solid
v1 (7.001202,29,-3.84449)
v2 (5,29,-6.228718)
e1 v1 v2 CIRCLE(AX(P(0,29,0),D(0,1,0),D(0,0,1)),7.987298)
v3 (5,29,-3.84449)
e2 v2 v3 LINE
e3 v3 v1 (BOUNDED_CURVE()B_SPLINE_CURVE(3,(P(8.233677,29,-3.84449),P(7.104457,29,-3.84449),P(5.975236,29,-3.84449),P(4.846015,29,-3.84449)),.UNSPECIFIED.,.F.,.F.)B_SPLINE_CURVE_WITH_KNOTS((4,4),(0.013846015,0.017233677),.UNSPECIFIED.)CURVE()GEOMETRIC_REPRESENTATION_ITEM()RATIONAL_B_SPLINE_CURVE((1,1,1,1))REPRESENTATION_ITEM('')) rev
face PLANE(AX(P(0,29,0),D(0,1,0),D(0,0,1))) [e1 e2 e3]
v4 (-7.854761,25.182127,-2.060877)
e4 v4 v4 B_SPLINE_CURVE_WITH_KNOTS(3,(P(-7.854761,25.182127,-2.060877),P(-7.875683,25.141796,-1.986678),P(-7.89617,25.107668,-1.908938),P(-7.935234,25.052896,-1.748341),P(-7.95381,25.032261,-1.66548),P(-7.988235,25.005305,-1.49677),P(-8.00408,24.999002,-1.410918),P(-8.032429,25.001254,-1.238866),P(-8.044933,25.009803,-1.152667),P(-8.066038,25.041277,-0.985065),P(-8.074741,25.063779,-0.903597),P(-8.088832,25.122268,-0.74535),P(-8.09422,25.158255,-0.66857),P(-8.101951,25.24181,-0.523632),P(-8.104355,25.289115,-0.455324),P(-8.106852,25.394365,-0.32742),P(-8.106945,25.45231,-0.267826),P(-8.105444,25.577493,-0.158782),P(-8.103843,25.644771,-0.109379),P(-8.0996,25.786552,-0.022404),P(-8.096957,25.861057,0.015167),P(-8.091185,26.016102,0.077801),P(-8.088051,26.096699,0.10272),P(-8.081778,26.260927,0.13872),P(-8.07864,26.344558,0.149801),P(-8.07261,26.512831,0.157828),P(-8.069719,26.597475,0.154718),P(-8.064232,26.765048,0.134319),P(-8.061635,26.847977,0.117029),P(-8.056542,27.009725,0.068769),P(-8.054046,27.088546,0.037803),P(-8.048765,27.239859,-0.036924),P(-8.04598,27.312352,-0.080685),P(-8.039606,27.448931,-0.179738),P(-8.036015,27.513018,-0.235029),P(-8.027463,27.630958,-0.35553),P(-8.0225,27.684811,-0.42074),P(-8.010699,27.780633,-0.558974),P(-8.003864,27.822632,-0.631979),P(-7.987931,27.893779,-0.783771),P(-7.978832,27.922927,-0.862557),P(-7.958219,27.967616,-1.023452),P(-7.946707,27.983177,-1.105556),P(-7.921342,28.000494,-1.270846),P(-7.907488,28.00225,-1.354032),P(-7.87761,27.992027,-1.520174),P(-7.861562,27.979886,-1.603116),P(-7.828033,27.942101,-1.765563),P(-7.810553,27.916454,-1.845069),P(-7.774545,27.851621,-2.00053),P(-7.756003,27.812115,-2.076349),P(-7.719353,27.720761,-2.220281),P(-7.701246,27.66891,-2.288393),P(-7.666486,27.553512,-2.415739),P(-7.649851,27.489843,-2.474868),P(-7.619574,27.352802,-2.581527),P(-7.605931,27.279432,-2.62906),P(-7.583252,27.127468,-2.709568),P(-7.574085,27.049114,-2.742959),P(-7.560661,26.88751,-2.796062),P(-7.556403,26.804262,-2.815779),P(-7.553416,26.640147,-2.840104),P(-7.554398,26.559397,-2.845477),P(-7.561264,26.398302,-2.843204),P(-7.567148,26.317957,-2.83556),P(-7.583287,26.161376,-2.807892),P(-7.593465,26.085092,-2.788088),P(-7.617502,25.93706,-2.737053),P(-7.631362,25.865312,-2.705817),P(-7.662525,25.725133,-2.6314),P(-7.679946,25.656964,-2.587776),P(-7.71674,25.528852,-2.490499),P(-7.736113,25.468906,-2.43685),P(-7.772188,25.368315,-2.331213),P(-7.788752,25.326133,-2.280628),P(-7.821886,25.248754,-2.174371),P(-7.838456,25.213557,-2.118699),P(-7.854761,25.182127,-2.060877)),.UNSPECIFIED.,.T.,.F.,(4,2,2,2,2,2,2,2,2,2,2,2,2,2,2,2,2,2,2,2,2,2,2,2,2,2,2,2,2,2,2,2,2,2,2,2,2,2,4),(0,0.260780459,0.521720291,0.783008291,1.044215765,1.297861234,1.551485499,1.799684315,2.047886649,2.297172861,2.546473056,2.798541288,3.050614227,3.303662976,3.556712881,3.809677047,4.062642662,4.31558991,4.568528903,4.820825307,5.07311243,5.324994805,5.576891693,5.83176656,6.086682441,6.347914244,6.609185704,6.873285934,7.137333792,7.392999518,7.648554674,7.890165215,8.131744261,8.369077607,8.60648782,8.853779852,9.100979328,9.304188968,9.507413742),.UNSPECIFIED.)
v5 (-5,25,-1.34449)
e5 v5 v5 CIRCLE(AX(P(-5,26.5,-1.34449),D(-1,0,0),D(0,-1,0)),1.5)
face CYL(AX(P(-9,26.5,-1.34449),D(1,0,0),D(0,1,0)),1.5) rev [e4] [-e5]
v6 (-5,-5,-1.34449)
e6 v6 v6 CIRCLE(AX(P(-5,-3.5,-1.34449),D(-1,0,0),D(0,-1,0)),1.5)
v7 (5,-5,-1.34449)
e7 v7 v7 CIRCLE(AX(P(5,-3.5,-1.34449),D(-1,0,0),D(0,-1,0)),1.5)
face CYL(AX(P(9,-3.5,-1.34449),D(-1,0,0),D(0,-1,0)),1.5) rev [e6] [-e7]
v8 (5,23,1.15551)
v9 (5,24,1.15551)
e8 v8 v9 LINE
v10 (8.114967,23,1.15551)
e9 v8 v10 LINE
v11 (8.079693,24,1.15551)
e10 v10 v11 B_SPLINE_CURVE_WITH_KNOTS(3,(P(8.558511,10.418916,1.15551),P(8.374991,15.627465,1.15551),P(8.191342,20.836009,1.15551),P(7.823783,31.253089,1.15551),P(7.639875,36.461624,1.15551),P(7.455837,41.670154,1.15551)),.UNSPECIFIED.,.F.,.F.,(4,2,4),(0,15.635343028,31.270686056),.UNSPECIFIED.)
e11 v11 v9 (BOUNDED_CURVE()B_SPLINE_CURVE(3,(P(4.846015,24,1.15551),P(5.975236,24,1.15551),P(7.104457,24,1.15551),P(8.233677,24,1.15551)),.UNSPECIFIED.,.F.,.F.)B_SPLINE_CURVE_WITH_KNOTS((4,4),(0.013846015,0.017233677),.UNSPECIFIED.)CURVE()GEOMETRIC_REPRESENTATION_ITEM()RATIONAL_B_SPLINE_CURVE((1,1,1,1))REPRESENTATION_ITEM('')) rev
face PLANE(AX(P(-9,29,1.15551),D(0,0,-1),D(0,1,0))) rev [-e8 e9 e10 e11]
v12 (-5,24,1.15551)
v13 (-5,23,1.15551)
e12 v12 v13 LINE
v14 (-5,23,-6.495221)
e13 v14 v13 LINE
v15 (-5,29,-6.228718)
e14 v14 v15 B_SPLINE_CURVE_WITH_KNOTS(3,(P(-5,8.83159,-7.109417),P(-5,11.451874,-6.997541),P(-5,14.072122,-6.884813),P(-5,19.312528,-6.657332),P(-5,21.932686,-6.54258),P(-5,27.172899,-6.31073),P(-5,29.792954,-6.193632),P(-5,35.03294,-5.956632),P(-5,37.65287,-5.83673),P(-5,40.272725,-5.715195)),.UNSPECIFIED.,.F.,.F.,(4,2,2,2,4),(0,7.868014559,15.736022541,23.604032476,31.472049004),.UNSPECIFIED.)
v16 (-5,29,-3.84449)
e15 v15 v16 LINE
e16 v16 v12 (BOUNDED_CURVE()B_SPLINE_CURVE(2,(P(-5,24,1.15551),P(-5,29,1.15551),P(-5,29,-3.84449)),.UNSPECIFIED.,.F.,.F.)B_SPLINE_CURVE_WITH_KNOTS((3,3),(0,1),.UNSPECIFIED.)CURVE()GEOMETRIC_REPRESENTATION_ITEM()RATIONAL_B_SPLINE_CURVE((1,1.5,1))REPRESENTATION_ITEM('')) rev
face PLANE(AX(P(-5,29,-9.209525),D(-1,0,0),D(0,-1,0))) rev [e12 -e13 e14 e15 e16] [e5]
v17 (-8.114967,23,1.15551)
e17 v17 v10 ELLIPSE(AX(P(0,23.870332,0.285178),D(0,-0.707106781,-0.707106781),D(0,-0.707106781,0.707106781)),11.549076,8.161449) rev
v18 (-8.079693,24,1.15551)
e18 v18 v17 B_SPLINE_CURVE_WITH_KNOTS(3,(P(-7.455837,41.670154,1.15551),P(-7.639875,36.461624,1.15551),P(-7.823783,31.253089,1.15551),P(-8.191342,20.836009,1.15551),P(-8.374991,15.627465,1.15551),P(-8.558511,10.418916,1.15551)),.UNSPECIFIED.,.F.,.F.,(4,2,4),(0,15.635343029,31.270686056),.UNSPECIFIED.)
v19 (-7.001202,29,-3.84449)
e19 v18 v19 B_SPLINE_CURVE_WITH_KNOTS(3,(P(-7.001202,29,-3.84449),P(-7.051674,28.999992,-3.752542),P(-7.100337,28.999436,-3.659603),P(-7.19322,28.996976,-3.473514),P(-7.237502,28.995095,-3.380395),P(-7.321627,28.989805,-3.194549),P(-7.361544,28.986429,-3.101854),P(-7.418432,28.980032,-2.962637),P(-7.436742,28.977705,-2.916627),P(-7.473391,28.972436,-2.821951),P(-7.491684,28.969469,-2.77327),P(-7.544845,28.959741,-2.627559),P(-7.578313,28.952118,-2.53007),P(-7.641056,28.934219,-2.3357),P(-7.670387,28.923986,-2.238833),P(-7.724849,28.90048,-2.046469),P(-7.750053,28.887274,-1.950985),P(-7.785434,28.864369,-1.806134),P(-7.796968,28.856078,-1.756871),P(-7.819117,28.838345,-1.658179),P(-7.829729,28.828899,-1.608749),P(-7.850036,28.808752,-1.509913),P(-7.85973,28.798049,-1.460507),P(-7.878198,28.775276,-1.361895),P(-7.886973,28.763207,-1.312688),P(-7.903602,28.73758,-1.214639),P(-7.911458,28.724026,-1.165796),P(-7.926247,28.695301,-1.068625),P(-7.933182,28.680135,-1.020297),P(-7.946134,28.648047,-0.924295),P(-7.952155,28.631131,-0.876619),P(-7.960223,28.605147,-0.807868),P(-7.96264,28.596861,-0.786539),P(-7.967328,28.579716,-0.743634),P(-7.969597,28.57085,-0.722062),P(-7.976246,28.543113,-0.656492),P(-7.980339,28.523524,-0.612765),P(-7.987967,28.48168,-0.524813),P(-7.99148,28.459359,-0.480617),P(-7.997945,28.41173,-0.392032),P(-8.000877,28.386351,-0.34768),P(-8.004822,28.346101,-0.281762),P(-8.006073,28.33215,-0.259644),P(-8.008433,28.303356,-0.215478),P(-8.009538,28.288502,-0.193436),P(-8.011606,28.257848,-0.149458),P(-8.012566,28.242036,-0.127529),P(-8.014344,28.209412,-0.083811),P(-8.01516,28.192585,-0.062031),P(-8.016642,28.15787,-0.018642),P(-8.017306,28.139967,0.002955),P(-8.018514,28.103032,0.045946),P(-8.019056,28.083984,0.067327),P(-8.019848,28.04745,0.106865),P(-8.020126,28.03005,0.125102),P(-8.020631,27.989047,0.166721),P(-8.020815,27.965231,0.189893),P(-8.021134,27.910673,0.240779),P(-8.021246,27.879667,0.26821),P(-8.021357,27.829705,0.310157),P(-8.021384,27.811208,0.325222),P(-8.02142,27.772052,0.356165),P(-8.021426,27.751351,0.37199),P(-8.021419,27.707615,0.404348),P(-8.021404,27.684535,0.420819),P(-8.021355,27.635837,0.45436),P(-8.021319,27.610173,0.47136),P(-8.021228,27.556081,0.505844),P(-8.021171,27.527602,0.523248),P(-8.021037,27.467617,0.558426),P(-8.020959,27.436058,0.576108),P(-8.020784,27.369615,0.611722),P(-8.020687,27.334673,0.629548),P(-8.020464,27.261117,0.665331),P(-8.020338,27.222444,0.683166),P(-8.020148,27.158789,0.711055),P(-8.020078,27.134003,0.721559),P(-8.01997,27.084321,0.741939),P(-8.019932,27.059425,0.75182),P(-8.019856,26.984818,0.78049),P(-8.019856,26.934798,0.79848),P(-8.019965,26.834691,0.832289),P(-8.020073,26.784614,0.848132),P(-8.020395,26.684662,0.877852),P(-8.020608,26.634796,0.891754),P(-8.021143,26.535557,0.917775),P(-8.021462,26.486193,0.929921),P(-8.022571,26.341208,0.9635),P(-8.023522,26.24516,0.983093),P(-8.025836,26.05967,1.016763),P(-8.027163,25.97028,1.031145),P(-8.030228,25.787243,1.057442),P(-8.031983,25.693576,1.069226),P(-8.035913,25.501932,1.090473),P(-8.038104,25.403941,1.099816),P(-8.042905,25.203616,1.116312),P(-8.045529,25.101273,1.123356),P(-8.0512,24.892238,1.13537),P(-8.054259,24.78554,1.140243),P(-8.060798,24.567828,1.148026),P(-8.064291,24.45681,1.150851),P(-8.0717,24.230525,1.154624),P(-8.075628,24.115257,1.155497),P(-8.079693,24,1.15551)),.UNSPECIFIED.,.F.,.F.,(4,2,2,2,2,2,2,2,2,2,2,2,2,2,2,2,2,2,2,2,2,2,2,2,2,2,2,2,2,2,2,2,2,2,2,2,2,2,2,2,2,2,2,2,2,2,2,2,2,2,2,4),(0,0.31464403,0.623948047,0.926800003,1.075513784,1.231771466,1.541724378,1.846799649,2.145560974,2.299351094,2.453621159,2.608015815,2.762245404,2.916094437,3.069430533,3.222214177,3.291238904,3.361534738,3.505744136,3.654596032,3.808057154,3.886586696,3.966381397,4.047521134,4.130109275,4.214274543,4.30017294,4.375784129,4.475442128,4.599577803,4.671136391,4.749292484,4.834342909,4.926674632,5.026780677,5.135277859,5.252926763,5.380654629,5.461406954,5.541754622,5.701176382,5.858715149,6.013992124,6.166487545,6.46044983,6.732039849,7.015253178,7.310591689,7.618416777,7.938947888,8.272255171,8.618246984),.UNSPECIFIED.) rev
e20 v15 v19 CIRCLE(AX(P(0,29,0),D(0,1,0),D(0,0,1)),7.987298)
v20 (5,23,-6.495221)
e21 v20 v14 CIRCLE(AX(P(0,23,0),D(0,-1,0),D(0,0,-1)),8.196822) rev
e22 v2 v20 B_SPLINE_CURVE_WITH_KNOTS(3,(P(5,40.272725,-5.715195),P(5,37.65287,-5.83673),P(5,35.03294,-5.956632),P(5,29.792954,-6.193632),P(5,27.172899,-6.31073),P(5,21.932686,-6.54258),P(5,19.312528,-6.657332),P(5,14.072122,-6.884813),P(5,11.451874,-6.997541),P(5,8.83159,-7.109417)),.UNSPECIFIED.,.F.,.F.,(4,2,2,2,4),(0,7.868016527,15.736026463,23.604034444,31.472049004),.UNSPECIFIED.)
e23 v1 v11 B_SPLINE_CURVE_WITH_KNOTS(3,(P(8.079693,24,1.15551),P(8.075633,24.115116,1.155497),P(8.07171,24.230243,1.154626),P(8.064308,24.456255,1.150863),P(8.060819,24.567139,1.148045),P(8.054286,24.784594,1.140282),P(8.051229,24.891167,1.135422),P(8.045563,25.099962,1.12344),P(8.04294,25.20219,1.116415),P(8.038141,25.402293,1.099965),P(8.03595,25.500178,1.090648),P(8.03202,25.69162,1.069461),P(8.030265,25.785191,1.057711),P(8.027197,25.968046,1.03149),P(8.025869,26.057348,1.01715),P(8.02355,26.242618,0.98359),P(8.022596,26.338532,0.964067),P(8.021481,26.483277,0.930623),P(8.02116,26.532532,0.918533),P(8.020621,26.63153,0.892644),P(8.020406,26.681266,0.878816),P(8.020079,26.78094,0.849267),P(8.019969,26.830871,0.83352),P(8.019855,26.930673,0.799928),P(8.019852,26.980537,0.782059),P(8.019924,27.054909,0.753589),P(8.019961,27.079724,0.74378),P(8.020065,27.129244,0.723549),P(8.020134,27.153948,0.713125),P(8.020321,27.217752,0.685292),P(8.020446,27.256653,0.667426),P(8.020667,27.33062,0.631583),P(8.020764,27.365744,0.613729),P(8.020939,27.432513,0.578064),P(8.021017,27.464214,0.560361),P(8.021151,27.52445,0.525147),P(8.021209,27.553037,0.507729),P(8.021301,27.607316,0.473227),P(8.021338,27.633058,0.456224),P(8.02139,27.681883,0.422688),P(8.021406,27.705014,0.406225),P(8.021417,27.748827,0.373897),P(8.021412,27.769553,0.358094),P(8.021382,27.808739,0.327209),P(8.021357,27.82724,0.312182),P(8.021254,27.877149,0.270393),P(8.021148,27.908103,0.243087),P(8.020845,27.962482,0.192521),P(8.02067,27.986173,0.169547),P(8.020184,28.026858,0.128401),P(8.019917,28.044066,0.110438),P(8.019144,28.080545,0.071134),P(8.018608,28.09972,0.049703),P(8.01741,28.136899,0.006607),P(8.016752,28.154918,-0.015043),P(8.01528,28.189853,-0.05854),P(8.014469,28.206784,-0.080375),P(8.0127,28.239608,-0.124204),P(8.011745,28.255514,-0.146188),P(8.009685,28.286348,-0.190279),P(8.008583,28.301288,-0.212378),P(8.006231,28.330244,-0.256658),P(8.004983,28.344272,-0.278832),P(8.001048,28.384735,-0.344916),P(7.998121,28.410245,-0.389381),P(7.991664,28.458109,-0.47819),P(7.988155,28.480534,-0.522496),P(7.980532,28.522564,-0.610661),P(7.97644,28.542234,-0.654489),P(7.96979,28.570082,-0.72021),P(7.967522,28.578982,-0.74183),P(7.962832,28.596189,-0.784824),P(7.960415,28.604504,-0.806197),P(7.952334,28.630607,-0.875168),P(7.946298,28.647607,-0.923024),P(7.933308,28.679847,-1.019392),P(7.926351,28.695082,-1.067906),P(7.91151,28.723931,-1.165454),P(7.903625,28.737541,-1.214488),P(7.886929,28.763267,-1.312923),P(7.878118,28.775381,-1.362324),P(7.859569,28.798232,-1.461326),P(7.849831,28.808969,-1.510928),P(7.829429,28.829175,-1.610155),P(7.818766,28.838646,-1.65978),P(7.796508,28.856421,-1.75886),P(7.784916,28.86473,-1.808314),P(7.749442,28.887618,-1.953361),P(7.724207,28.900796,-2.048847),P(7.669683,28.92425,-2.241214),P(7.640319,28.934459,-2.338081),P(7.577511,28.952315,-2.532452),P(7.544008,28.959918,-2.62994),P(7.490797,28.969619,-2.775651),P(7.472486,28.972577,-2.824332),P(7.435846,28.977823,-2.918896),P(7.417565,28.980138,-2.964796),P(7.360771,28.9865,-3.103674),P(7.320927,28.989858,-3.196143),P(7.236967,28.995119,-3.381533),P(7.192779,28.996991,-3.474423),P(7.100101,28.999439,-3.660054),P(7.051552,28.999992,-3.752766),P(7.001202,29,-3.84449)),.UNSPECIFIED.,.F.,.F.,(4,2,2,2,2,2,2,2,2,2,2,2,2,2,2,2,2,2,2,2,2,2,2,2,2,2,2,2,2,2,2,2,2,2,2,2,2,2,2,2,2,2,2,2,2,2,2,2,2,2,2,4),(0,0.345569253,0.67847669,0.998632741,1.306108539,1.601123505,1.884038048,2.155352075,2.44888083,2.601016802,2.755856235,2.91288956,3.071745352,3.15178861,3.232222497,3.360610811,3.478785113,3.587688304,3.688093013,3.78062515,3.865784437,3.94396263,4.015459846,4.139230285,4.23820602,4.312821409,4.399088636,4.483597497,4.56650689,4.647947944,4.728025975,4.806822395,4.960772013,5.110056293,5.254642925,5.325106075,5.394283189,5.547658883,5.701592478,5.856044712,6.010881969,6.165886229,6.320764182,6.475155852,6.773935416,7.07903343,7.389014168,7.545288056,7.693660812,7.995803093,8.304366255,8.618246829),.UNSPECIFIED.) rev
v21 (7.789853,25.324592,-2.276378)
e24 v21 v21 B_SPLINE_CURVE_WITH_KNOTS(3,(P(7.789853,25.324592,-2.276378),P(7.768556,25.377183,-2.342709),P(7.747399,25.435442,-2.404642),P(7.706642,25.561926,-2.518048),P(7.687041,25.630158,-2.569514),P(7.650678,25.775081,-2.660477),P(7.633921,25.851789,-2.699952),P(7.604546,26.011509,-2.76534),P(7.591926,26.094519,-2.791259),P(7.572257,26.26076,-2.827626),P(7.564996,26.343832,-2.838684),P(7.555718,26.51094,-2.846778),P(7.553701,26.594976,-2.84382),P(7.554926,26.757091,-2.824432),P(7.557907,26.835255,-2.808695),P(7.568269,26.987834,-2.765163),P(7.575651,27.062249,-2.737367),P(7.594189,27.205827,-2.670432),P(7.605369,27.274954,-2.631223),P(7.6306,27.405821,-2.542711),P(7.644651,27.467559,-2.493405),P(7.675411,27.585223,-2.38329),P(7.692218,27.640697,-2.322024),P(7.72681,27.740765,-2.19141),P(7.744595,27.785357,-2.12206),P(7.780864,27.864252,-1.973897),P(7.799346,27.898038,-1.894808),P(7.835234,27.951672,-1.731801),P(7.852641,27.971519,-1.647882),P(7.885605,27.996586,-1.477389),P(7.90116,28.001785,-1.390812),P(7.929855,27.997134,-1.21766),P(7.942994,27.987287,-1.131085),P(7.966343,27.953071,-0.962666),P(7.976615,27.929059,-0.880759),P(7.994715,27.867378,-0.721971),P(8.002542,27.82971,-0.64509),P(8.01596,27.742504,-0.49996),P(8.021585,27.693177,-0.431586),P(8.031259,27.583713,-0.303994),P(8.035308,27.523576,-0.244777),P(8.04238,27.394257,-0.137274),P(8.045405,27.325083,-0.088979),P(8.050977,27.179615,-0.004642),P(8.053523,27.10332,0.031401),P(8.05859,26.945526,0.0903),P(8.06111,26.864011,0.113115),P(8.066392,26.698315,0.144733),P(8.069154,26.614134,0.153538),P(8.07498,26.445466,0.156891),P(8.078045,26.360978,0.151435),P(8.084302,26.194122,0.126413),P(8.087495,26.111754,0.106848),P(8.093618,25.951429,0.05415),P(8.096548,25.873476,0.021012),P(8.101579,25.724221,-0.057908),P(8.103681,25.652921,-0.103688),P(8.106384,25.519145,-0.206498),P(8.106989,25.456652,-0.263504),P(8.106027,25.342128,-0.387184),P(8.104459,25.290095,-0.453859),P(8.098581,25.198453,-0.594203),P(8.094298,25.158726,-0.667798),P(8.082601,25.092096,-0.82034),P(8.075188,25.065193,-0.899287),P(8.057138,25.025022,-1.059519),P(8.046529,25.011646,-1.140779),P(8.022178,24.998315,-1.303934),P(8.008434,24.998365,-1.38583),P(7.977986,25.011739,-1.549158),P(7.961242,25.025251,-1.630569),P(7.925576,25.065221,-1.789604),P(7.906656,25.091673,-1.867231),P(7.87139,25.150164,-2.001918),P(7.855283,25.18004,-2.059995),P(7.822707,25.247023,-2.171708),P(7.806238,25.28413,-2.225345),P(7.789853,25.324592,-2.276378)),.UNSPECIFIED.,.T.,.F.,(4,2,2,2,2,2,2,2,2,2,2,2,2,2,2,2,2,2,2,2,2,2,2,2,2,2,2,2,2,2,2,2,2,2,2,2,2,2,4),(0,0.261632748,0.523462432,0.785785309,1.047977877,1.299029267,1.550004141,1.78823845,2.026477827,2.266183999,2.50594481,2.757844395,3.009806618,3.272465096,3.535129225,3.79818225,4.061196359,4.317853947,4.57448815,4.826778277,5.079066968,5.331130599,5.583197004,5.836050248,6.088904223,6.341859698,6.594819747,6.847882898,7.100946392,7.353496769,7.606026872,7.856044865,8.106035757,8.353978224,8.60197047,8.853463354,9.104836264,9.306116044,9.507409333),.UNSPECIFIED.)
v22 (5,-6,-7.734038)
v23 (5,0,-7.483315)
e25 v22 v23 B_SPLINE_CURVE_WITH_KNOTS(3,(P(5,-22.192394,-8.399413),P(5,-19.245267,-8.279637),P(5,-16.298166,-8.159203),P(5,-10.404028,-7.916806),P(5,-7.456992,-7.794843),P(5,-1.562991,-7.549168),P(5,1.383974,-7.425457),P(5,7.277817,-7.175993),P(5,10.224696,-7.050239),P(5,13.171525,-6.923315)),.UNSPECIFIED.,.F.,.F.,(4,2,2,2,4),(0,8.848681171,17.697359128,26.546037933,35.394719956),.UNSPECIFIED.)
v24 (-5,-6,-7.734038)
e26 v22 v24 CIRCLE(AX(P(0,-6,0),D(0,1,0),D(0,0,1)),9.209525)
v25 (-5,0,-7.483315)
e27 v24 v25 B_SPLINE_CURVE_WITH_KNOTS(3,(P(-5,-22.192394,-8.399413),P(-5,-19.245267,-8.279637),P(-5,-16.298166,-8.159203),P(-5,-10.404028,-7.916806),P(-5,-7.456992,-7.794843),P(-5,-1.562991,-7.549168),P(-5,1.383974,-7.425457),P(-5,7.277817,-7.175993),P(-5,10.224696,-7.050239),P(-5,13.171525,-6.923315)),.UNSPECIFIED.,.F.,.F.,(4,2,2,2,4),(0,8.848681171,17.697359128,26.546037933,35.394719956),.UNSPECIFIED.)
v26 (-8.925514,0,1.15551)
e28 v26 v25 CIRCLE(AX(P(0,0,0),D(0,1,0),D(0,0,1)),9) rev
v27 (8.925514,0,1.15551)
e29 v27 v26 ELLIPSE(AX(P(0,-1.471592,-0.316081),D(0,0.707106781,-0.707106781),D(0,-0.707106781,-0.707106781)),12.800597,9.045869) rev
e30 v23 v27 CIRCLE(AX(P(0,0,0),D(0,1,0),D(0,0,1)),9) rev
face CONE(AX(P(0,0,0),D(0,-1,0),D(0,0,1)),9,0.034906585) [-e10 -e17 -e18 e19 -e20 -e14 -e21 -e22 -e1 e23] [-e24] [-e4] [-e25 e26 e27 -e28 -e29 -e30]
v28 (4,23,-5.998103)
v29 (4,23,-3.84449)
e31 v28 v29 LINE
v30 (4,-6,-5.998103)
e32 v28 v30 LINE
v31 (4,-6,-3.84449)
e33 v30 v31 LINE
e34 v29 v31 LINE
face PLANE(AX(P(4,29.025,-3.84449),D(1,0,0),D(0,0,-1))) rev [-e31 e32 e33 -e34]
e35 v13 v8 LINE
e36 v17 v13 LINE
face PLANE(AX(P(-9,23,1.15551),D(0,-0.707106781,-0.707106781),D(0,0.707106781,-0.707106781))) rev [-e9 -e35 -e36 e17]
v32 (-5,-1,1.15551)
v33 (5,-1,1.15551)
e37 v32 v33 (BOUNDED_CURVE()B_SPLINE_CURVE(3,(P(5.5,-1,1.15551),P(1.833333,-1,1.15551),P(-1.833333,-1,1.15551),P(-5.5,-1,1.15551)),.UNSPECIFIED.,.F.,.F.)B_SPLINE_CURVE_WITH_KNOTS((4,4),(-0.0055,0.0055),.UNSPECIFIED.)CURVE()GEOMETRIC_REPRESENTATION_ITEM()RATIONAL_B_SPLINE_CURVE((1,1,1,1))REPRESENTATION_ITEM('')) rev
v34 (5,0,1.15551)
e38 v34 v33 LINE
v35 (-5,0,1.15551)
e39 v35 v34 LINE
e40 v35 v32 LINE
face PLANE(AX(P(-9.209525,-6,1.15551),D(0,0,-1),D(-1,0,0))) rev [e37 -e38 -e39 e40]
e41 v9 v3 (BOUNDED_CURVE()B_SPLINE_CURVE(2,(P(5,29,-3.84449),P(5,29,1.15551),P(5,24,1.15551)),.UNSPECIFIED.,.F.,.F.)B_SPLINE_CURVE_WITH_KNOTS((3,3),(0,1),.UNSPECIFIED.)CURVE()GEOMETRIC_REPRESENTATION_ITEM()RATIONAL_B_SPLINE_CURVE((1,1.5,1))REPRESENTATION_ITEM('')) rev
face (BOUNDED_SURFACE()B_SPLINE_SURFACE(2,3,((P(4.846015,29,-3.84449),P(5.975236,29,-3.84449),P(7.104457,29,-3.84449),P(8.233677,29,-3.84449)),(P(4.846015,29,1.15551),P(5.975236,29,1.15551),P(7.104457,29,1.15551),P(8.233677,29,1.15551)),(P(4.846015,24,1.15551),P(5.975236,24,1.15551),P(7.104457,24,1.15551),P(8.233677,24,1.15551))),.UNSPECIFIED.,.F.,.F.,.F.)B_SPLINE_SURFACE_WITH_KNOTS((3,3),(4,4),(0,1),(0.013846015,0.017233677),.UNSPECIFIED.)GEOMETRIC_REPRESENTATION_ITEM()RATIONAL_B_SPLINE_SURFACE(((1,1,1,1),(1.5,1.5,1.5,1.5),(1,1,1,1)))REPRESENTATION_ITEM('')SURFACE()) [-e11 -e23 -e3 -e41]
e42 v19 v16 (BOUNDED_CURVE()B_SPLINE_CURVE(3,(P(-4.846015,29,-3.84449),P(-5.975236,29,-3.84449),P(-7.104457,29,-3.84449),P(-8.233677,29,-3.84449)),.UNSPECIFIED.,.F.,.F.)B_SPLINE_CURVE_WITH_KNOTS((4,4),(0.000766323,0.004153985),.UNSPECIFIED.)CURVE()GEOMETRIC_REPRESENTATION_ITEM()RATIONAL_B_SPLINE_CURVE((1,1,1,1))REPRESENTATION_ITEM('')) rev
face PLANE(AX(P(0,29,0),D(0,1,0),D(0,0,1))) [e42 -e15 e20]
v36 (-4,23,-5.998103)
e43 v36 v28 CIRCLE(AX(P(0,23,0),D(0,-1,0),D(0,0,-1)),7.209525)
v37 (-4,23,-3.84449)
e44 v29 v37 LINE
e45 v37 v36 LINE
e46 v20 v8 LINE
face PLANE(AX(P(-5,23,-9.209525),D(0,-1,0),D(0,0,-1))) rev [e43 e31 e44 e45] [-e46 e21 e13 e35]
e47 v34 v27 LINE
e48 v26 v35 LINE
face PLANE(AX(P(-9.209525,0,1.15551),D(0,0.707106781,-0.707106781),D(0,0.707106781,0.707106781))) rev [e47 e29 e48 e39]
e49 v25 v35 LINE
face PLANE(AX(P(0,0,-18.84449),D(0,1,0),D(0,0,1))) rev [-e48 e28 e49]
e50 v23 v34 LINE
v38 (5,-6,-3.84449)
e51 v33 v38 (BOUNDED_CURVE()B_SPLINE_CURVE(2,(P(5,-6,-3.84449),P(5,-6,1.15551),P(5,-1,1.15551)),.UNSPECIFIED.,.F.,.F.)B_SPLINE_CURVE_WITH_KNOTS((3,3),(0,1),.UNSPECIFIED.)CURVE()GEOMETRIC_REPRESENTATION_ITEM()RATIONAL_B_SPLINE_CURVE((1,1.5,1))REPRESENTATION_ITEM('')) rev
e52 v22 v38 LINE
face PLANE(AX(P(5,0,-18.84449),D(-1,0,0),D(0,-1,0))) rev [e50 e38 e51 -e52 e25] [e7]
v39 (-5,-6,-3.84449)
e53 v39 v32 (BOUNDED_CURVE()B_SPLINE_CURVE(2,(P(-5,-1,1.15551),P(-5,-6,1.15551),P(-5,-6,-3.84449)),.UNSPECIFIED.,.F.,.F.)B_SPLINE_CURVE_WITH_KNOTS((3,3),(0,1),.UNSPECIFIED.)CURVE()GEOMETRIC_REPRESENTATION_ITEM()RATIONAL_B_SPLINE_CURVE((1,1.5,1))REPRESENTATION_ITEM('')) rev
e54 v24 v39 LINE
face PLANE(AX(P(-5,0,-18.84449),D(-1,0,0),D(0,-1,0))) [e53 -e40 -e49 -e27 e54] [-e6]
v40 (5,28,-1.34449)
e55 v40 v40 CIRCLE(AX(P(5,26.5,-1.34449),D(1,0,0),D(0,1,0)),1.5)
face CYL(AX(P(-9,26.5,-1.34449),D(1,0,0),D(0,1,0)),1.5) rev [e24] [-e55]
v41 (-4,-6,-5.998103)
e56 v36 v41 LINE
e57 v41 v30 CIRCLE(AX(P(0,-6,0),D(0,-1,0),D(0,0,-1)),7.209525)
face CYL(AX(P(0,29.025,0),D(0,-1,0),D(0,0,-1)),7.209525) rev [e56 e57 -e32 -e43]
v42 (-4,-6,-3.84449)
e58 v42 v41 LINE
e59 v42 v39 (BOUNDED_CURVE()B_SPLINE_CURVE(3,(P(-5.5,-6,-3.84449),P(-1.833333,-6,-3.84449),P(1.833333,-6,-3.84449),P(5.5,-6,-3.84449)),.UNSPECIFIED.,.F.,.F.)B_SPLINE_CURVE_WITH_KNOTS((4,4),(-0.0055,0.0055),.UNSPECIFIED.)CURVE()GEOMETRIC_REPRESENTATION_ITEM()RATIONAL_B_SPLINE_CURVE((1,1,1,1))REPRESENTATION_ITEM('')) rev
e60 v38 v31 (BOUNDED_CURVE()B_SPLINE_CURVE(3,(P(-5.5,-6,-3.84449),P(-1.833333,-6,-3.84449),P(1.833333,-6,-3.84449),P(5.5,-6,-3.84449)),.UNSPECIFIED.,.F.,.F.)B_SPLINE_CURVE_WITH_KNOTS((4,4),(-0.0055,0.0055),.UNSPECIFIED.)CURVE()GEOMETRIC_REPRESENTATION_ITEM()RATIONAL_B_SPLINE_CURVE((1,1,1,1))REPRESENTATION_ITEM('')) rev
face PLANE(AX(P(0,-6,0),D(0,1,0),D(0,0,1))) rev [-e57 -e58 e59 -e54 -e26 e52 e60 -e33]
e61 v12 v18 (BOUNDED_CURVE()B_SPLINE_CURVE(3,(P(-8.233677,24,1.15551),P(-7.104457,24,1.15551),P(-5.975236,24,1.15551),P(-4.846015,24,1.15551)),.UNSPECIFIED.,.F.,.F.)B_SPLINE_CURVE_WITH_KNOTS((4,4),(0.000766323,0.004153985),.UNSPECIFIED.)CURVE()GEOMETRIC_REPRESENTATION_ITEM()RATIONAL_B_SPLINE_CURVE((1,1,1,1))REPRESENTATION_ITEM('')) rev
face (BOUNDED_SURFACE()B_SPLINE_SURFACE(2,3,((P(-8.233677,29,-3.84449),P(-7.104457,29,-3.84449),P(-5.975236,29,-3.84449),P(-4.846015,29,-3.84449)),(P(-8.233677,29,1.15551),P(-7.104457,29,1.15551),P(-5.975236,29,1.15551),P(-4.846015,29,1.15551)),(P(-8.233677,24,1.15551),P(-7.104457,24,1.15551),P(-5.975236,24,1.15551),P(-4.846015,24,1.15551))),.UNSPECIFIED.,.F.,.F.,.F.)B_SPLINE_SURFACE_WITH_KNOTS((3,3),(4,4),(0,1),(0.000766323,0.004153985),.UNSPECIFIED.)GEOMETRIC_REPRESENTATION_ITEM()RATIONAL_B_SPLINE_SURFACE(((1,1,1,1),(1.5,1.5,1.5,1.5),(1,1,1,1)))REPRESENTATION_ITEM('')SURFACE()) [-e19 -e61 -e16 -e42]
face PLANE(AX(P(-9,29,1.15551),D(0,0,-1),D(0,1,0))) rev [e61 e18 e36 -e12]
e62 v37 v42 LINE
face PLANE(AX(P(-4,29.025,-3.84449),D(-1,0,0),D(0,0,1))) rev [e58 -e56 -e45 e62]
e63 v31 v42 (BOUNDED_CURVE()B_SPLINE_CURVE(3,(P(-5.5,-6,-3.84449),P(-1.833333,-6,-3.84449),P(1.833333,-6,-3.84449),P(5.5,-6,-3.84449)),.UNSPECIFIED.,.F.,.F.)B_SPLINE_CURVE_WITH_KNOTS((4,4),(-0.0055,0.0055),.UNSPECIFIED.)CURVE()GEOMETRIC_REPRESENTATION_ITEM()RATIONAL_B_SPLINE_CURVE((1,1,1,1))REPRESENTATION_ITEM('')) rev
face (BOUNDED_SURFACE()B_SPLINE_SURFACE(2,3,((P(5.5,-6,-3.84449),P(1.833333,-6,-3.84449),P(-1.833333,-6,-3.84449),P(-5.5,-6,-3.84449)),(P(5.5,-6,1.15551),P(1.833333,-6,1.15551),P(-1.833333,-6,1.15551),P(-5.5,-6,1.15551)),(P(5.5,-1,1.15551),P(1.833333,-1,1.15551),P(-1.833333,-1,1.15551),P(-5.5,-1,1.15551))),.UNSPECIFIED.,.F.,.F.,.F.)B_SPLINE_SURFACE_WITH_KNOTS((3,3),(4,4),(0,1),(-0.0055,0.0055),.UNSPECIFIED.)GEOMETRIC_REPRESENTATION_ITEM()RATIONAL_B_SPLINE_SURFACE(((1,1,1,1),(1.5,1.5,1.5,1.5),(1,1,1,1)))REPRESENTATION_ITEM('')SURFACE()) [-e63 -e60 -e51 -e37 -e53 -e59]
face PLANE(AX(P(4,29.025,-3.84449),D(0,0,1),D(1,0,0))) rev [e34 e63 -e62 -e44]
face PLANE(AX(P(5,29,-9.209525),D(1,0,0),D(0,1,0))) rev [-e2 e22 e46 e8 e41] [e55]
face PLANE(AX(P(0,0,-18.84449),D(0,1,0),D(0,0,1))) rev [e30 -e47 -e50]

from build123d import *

# Parameters (mm, degrees)
SKETCH1_R                     = 9
BOSS_EXTRUDE1_DEPTH           = 29
BOSS_EXTRUDE1_TAPER           = 2
BOSS_EXTRUDE1_OTHER_WAY_DEPTH = 6
BOSS_EXTRUDE1_OTHER_WAY_TAPER = -2
CUT_EXTRUDE1_DEPTH            = 32.790418169
CUT_EXTRUDE1_DEPTH_BACK       = 32.790418169
CUT_EXTRUDE2_START            = -10.365035118
CUT_EXTRUDE2_OUTLINE_W        = 9.770566763
CUT_EXTRUDE2_OUTLINE_H        = 6
CUT_EXTRUDE2_DEPTH            = 10.365035118
CUT_EXTRUDE3_DEPTH            = 34.493511964
CUT_EXTRUDE3_DEPTH_BACK       = 34.493511964
SKETCH5_R                     = 1.5
FILLET1_SIZE                  = 5
CUT_EXTRUDE4_DEPTH            = 32.730353664
CUT_EXTRUDE4_DEPTH_BACK       = 32.730353664
SKETCH8_W                     = 10
SKETCH8_H                     = 6
CUT_EXTRUDE5_DEPTH            = 33.084793141
CUT_EXTRUDE6_DEPTH            = 34.493511964
CUT_EXTRUDE6_DEPTH_BACK       = 34.493511964
SKETCH9_R                     = 1.5
FILLET2_SIZE                  = 5
CUT_EXTRUDE7_DEPTH            = 38.293636915


with BuildPart() as part:
    # Sketch1 → Boss-Extrude1 (new body)
    with BuildSketch(Plane(origin=(0, 0, 0), x_dir=(1, 0, 0), z_dir=(0, 1, 0))):
        Circle(SKETCH1_R)
    extrude(amount=BOSS_EXTRUDE1_DEPTH, taper=BOSS_EXTRUDE1_TAPER)

    # Sketch1 → Boss-Extrude1 other way (add)
    with BuildSketch(Plane(origin=(0, 0, 0), x_dir=(1, 0, 0), z_dir=(0, 1, 0))):
        Circle(SKETCH1_R)
    extrude(amount=-BOSS_EXTRUDE1_OTHER_WAY_DEPTH, taper=BOSS_EXTRUDE1_OTHER_WAY_TAPER)

    # Sketch3 → Cut-Extrude1 (cut, two sides: drawn at the far end of the back side and taken through both)
    with BuildSketch(Plane(origin=(0, 0, 0), x_dir=(0, 0, -1), z_dir=(1, 0, 0)).offset(-CUT_EXTRUDE1_DEPTH_BACK)):
        Polygon((-1.155510401, -6), (-1.155510401, 0), (-11.155510401, 10), (-11.155510401, -6), align=None)
    extrude(amount=CUT_EXTRUDE1_DEPTH + CUT_EXTRUDE1_DEPTH_BACK, mode=Mode.SUBTRACT)

    # Cut-Extrude2: read off the stored shape, not the designer's step
    # Cut-Extrude2 outline → Cut-Extrude2 (cut)
    with BuildSketch(Plane.XY.offset(1.155510401).offset(CUT_EXTRUDE2_START)):
        with Locations((-9.885283382, -3)):
            Rectangle(CUT_EXTRUDE2_OUTLINE_W, CUT_EXTRUDE2_OUTLINE_H)
        with Locations((9.885283382, -3)):
            Rectangle(CUT_EXTRUDE2_OUTLINE_W, CUT_EXTRUDE2_OUTLINE_H)
    extrude(amount=CUT_EXTRUDE2_DEPTH, mode=Mode.SUBTRACT)

    # Sketch5 → Cut-Extrude3 (cut, two sides: drawn at the far end of the back side and taken through both)
    with BuildSketch(Plane.ZY.offset(5).offset(-CUT_EXTRUDE3_DEPTH_BACK)):
        with Locations(Location((-1.344489599, -3.5, 0), (0, 0, 270))):
            Circle(SKETCH5_R)
    extrude(amount=CUT_EXTRUDE3_DEPTH + CUT_EXTRUDE3_DEPTH_BACK, mode=Mode.SUBTRACT)

    # Fillet1
    # a fillet whose section is not a circle: 5 mm, written as the material it takes off along each edge
    with BuildSketch(Plane(origin=(17.5, -6, 1.155510401), x_dir=(0, 0, -1), z_dir=(-1, 0, 0))) as fillet1_piece_1:
        with BuildLine():
            Bezier((FILLET1_SIZE, 0), (0, 0), (0, -FILLET1_SIZE), weights=[1, 1.5, 1])
            Line((0, -FILLET1_SIZE), (0, 0))
            Line((0, 0), (FILLET1_SIZE, 0))
        make_face()
    extrude(amount=35, mode=Mode.SUBTRACT)

    # Sketch7 → Cut-Extrude4 (cut, two sides: drawn at the far end of the back side and taken through both)
    with BuildSketch(Plane(origin=(0, 0, 0), x_dir=(0, 0, -1), z_dir=(1, 0, 0)).offset(-CUT_EXTRUDE4_DEPTH_BACK)):
        Polygon((-1.155510401, 29), (-1.155510401, 23), (-12.24506556, 11.91044484), (-12.24506556, 29), align=None)
    extrude(amount=CUT_EXTRUDE4_DEPTH + CUT_EXTRUDE4_DEPTH_BACK, mode=Mode.SUBTRACT)

    # Sketch8 → Cut-Extrude5 (cut, through all)
    with BuildSketch(Plane.XY.offset(1.155510401)):
        with Locations((0, 26)):
            Rectangle(SKETCH8_W, SKETCH8_H)
    extrude(amount=-CUT_EXTRUDE5_DEPTH, mode=Mode.SUBTRACT)

    # Sketch9 → Cut-Extrude6 (cut, two sides: drawn at the far end of the back side and taken through both)
    with BuildSketch(Plane(origin=(-5, 0, 0), x_dir=(0, 0, -1), z_dir=(1, 0, 0)).offset(-CUT_EXTRUDE6_DEPTH_BACK)):
        with Locations(Location((1.344489599, 26.5, 0), (0, 0, 298.528207369))):
            Circle(SKETCH9_R)
    extrude(amount=CUT_EXTRUDE6_DEPTH + CUT_EXTRUDE6_DEPTH_BACK, mode=Mode.SUBTRACT)

    # Fillet2
    # a fillet whose section is not a circle: 5 mm, written as the material it takes off along each edge
    with BuildSketch(Plane(origin=(-20.403272741, 29, 1.155510401), x_dir=(0, 0, -1), z_dir=(1, 0, 0))) as fillet2_piece_1:
        with BuildLine():
            Bezier((FILLET2_SIZE, 0), (0, 0), (0, -FILLET2_SIZE), weights=[1, 1.5, 1])
            Line((0, -FILLET2_SIZE), (0, 0))
            Line((0, 0), (FILLET2_SIZE, 0))
        make_face()
    extrude(amount=27.903272741, mode=Mode.SUBTRACT)
    with BuildSketch(Plane(origin=(-7.5, 29, 1.155510401), x_dir=(0, -1, 0), z_dir=(1, 0, 0))) as fillet2_piece_2:
        with BuildLine():
            Bezier((FILLET2_SIZE, 0), (0, 0), (0, FILLET2_SIZE), weights=[1, 1.5, 1])
            Line((0, FILLET2_SIZE), (0, 0))
            Line((0, 0), (FILLET2_SIZE, 0))
        make_face()
    extrude(amount=27.903272741, mode=Mode.SUBTRACT)

    # Sketch10 → Cut-Extrude7 (cut, through all)
    with BuildSketch(Plane.XZ.offset(6)):
        with BuildLine():
            Line((-4, -3.844489599), (-4, -5.998103467))
            ThreePointArc((-4, -5.998103467), (0, -7.209524617), (4, -5.998103467))
            Line((4, -5.998103467), (4, -3.844489599))
            Line((4, -3.844489599), (-4, -3.844489599))
        make_face()
    extrude(amount=-CUT_EXTRUDE7_DEPTH, mode=Mode.SUBTRACT)


solid = part.part
